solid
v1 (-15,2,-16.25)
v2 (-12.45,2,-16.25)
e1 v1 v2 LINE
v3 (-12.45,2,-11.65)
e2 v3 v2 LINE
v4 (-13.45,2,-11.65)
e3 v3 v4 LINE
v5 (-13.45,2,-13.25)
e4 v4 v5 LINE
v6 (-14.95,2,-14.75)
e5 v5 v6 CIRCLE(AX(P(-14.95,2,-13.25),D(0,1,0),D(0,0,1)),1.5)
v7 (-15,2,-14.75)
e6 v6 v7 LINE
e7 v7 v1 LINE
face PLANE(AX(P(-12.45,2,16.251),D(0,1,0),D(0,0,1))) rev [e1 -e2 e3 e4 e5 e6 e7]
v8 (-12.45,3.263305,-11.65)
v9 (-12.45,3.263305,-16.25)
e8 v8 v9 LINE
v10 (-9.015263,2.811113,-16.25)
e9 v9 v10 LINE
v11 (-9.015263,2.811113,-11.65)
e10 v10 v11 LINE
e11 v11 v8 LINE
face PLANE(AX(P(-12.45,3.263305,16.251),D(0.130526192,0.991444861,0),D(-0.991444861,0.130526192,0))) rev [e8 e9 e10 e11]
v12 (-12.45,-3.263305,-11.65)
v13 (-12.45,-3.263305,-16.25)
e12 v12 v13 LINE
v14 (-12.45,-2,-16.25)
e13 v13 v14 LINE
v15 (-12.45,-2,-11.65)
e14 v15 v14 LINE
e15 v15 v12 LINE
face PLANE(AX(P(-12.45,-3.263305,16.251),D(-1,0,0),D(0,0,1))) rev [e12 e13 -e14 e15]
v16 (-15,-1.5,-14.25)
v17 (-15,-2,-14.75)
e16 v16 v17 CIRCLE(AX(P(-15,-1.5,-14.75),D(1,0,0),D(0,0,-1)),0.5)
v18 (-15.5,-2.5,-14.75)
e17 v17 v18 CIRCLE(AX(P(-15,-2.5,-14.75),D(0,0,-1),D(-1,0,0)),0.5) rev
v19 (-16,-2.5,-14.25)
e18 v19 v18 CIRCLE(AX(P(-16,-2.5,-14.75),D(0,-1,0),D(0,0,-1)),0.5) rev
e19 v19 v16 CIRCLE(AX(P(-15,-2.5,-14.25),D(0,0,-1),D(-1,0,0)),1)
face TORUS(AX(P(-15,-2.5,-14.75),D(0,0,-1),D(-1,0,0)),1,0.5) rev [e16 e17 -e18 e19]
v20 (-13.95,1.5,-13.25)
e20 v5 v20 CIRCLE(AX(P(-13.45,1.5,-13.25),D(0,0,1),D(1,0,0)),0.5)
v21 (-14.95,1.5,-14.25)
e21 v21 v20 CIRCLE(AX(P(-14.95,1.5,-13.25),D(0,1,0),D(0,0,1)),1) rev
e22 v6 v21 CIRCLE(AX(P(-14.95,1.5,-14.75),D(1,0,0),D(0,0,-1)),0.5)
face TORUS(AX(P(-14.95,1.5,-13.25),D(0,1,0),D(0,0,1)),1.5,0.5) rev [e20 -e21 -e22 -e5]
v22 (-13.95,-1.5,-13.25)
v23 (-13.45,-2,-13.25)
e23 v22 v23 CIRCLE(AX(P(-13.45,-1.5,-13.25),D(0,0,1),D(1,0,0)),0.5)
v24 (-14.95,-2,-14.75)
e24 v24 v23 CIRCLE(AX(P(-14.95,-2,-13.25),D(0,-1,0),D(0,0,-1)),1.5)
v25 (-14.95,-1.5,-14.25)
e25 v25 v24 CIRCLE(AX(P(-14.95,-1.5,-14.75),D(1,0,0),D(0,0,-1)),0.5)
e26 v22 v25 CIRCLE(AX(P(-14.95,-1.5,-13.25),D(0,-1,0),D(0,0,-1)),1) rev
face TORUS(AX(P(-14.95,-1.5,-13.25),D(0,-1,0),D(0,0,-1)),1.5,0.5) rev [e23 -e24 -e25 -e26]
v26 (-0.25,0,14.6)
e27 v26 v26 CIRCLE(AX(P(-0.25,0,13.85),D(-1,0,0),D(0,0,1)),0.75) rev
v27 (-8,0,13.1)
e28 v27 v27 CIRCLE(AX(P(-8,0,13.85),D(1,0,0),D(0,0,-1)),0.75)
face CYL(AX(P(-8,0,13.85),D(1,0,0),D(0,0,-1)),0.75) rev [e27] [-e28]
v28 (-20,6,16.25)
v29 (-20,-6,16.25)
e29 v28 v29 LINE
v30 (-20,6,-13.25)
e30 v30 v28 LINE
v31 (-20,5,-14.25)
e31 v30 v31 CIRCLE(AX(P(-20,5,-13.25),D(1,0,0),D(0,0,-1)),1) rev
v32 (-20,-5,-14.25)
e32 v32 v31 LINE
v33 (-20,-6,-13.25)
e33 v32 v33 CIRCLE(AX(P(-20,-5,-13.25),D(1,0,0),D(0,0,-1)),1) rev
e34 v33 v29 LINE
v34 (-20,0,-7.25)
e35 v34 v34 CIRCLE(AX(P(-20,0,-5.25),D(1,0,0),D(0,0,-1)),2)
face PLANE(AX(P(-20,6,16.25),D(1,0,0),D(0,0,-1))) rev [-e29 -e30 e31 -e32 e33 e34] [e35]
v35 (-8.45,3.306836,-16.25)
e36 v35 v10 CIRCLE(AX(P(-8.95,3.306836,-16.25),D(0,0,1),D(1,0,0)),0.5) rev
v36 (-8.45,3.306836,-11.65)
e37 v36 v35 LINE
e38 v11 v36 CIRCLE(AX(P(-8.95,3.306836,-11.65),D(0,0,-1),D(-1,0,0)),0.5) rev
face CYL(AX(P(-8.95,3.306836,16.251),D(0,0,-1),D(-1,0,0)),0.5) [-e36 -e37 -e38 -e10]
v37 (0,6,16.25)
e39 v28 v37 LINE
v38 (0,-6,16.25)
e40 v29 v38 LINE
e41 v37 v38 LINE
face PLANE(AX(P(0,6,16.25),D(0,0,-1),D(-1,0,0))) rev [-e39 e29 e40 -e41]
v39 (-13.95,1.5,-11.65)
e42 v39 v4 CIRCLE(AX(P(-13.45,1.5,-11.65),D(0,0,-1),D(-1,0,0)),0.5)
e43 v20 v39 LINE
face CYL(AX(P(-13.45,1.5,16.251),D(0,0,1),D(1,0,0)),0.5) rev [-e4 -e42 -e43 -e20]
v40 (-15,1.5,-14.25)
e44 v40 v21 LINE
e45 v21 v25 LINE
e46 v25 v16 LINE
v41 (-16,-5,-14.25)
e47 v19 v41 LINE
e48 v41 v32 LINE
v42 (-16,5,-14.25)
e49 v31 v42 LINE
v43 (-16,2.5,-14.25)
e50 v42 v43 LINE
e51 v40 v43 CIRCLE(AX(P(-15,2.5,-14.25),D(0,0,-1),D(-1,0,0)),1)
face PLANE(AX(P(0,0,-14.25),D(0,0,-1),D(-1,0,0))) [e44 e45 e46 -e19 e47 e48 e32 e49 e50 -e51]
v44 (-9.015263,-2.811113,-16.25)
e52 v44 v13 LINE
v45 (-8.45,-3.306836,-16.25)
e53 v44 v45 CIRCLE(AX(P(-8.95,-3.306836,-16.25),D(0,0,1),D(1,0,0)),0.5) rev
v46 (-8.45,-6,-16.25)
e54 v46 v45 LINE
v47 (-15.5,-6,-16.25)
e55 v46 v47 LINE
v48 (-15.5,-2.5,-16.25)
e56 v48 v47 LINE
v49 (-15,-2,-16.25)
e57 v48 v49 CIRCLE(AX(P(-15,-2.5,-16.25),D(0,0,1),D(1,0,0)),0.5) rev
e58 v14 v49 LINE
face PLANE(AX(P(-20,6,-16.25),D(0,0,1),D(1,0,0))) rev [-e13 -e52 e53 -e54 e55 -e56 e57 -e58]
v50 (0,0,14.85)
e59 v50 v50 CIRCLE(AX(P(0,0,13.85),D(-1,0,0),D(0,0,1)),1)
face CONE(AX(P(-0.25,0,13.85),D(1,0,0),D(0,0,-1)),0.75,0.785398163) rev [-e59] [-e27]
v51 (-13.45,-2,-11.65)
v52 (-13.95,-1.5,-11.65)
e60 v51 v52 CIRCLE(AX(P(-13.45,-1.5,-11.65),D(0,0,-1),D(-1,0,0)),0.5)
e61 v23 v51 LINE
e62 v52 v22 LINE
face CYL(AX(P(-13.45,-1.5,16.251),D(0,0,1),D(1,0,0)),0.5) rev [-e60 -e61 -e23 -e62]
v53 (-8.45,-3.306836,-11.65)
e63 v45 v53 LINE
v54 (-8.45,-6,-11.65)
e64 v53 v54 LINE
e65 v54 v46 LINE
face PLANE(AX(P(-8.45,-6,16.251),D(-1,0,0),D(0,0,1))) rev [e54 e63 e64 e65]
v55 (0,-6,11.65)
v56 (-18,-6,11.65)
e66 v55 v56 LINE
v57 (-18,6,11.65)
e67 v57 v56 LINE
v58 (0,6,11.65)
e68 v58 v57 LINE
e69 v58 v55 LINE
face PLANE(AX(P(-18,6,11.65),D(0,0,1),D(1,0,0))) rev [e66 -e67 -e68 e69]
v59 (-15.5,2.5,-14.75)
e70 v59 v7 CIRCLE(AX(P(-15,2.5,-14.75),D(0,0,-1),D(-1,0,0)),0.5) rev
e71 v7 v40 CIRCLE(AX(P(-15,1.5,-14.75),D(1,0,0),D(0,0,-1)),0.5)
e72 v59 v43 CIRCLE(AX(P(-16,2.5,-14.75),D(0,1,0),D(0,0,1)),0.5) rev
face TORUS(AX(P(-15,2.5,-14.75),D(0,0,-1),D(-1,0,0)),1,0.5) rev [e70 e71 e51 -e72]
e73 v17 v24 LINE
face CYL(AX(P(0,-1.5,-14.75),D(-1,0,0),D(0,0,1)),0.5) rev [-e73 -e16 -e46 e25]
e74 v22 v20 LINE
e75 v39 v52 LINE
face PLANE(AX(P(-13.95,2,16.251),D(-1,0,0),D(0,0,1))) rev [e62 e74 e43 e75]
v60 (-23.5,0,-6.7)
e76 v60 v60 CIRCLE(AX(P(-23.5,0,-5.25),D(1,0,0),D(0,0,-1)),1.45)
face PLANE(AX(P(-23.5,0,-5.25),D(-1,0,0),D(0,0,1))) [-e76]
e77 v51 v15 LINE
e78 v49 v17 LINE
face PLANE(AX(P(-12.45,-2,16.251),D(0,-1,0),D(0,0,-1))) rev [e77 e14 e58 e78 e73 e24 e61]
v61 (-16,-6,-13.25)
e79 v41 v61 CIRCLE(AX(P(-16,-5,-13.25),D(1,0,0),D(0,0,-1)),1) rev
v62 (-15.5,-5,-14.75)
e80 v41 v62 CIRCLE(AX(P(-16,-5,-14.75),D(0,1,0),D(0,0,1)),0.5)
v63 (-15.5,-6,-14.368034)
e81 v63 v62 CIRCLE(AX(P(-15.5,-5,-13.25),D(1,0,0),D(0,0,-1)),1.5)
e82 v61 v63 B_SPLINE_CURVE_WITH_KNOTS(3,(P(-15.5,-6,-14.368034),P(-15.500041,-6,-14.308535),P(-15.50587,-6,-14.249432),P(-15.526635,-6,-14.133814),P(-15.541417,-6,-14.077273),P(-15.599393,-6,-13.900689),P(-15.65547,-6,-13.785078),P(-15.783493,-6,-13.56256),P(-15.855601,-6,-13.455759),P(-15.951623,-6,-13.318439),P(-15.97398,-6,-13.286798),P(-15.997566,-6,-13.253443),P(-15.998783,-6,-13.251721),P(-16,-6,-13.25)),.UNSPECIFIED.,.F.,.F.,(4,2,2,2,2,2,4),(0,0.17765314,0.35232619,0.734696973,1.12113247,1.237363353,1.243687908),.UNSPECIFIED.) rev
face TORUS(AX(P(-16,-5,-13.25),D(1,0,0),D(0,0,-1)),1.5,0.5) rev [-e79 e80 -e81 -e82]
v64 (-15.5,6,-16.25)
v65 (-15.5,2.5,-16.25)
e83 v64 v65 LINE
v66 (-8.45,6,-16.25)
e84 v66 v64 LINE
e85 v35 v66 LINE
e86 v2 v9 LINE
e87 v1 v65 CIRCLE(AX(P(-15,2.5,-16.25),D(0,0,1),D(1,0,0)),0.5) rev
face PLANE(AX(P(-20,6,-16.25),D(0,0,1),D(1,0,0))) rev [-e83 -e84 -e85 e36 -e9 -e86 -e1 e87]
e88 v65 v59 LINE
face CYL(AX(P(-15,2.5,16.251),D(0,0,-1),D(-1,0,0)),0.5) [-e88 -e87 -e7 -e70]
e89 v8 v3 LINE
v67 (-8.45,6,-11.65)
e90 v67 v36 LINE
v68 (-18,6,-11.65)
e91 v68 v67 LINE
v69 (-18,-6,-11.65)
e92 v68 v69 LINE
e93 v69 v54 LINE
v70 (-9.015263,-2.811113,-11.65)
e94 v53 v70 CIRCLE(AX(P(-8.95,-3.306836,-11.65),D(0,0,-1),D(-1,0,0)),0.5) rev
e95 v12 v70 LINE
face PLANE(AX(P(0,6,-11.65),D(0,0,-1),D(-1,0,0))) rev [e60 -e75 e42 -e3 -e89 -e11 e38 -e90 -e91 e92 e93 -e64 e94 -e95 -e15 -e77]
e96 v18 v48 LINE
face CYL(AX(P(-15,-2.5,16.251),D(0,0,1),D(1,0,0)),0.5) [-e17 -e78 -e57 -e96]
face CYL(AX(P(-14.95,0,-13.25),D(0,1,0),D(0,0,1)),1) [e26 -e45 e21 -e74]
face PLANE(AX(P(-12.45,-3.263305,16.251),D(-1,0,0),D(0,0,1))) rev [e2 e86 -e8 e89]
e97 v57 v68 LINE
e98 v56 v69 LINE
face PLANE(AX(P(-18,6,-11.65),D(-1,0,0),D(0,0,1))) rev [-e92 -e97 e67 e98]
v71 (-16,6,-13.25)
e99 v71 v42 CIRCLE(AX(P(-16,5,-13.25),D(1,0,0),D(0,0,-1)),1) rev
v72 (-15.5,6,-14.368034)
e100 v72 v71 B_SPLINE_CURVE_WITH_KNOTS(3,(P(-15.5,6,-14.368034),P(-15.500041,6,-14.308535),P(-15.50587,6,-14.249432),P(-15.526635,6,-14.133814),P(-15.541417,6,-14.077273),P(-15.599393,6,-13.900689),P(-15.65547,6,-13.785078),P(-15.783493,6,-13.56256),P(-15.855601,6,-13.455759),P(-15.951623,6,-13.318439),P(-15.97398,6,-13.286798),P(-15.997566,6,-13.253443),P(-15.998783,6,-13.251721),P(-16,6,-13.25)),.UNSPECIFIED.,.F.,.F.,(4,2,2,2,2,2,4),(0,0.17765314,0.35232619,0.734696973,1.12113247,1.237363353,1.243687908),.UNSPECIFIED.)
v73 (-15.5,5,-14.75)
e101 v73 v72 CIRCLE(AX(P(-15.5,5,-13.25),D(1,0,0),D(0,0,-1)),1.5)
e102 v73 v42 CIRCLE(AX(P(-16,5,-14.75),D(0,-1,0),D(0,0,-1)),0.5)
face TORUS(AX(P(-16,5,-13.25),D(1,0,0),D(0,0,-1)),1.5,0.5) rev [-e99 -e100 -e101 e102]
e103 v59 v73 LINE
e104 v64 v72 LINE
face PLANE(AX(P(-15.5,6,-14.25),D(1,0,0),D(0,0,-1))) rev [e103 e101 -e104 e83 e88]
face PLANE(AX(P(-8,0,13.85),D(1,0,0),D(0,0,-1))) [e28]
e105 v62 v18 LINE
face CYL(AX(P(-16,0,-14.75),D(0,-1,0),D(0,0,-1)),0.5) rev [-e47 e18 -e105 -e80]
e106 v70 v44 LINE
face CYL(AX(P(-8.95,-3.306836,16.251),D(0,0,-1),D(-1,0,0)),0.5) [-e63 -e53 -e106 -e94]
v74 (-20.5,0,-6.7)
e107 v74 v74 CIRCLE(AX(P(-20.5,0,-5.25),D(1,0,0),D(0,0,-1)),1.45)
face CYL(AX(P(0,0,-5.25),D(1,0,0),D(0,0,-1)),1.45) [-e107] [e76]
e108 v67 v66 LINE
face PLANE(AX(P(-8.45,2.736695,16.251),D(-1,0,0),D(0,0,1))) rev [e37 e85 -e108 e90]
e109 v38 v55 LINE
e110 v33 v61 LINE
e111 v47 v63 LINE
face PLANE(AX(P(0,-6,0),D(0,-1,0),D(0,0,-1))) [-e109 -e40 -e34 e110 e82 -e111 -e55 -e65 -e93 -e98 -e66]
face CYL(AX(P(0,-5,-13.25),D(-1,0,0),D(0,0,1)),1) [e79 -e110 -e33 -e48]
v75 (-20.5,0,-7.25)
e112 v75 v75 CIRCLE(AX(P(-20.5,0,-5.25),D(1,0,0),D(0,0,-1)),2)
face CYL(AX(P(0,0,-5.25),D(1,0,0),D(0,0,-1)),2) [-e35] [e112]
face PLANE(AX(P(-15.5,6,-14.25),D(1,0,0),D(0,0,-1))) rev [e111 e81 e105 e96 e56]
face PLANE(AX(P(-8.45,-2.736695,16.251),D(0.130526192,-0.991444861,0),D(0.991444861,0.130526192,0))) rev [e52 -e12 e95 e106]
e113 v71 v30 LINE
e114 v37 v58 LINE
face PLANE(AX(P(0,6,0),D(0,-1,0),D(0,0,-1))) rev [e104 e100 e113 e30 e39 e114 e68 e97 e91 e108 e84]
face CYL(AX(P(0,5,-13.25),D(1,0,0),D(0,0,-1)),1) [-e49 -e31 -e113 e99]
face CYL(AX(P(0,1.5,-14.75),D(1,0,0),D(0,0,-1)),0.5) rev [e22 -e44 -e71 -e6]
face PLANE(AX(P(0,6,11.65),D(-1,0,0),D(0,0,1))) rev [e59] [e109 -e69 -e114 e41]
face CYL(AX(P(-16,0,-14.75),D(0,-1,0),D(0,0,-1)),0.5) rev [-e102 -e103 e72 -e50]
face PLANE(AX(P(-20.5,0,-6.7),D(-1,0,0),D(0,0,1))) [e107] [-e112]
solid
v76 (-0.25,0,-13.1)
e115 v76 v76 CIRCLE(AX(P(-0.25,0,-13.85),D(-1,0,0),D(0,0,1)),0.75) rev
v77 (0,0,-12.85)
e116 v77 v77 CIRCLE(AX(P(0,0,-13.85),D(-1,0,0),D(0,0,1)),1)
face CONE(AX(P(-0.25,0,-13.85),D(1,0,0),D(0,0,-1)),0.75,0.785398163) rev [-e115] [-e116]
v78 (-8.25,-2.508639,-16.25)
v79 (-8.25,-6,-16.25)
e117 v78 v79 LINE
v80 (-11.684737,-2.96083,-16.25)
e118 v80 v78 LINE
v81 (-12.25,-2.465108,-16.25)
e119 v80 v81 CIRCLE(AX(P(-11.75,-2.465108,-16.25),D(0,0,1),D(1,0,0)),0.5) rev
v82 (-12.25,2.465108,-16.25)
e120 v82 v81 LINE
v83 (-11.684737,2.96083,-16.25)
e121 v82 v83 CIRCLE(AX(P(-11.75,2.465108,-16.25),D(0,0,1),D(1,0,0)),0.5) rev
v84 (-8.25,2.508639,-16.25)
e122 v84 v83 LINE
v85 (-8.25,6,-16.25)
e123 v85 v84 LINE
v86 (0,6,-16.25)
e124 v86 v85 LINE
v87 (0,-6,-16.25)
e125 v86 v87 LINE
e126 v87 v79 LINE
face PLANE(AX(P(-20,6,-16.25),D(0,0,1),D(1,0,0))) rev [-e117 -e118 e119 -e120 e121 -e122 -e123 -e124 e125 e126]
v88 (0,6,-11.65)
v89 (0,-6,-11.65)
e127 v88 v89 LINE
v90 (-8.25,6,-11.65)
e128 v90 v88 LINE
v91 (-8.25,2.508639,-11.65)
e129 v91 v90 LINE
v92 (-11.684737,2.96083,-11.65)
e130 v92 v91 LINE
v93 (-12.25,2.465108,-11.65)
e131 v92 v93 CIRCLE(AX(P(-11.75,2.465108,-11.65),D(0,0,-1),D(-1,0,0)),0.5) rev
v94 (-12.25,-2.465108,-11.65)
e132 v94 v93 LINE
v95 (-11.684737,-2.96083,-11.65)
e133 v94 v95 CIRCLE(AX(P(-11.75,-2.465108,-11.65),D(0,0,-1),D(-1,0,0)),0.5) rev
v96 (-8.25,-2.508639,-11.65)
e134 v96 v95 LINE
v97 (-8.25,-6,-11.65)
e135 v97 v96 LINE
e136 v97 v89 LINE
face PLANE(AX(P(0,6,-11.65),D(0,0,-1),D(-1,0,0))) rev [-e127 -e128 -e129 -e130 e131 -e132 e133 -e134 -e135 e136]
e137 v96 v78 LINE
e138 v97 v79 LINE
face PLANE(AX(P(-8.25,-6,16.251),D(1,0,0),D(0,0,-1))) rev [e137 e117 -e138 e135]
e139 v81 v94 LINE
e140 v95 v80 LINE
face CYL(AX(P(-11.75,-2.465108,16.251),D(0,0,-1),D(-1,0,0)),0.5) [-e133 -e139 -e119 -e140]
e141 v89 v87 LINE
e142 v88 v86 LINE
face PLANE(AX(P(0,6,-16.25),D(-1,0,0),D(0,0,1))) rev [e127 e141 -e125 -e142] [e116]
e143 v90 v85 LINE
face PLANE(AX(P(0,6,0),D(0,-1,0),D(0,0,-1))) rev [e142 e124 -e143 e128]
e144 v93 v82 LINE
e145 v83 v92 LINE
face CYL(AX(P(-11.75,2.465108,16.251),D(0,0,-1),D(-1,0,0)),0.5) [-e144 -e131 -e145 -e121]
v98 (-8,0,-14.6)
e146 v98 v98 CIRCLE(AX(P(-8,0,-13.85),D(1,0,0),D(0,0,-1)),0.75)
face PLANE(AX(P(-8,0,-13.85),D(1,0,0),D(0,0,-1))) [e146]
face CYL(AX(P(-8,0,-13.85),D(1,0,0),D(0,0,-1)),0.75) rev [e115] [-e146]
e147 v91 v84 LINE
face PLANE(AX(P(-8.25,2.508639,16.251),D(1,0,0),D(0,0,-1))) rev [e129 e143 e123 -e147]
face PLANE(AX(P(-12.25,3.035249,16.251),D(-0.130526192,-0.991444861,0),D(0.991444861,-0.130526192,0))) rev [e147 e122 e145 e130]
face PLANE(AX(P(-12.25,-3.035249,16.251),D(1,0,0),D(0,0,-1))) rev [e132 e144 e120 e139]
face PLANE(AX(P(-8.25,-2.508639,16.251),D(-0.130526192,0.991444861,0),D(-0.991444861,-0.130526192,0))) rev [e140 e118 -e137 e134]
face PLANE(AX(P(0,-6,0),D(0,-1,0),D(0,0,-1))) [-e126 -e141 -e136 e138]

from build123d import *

# Parameters (mm, degrees)
BOSS_EXTRUDE1_DEPTH = 6
SKETCH4_R           = 0.75
CUT_EXTRUDE3_DEPTH  = 8
CHAMFER1_SIZE       = 0.25
CUT_EXTRUDE1_REACH  = 40.63
SKETCH2_W           = 1.5
SKETCH2_H           = 4
SKETCH5_W           = 6.05
SKETCH5_H           = 4
CUT_EXTRUDE5_DEPTH  = 2
SKETCH6_W           = 4.5
SKETCH6_H           = 2
CUT_EXTRUDE6_DEPTH  = 29.426440157
FILLET7_R           = 1
CUT_EXTRUDE2_REACH  = 40.63
FILLET9_R           = 0.5
FILLET3_R           = 0.5


with BuildPart() as part:
    # Sketch1 → Boss-Extrude1 (new, symmetric)
    with BuildSketch(Plane(origin=(0, 0, 0), x_dir=(1, 0, 0), z_dir=(0, 1, 0))):
        Polygon((0, 16.25), (0, 11.65), (-18, 11.65), (-18, -11.65), (0, -11.65), (0, -16.25), (-20, -16.25), (-20, 16.25), align=None)
    extrude(amount=BOSS_EXTRUDE1_DEPTH, both=True)

    # Sketch4 → Cut-Extrude3 (cut)
    with BuildSketch(Plane(origin=(0, 0, 0), x_dir=(0, 0, -1), z_dir=(1, 0, 0))):
        with Locations((13.85, 0)):
            Circle(SKETCH4_R)
        with Locations((-13.85, 0)):
            Circle(SKETCH4_R)
    extrude(amount=-CUT_EXTRUDE3_DEPTH, mode=Mode.SUBTRACT)

    # Chamfer1
    chamfer1_edges = [part.edges().sort_by_distance(p)[0] for p in [
        (0, 0, -13.1),
        (0, 0, 14.6),
    ]]
    chamfer(chamfer1_edges, length=CHAMFER1_SIZE)

    # Sketch2 → Cut-Extrude1 (cut, up to next)
    with BuildSketch(Plane(origin=(0, 0, -16.25), x_dir=(-1, 0, 0), z_dir=(0, 0, -1)), mode=Mode.PRIVATE) as cut_extrude1_sk1:
        with Locations((13.2, 0)):
            Rectangle(SKETCH2_W, SKETCH2_H)
    cut_extrude1_tool1 = extrude(cut_extrude1_sk1.sketch, amount=-CUT_EXTRUDE1_REACH, mode=Mode.PRIVATE) & part.part
    add(cut_extrude1_tool1.solids().sort_by_distance((-13.2, 0, -16.25))[0], mode=Mode.SUBTRACT)

    # Sketch5 → Cut-Extrude5 (cut)
    with BuildSketch(Plane(origin=(0, 0, -16.25), x_dir=(-1, 0, 0), z_dir=(0, 0, -1))):
        with Locations((16.975, 0)):
            Rectangle(SKETCH5_W, SKETCH5_H)
    extrude(amount=-CUT_EXTRUDE5_DEPTH, mode=Mode.SUBTRACT)

    # Sketch6 → Cut-Extrude6 (cut, through all)
    with BuildSketch(Plane.XZ.offset(6)):
        with Locations((-17.75, -15.25)):
            Rectangle(SKETCH6_W, SKETCH6_H)
    extrude(amount=-CUT_EXTRUDE6_DEPTH, mode=Mode.SUBTRACT)

    # Fillet7
    fillet7_edges = [part.edges().sort_by_distance(p)[0] for p in [
        (-13.95, 0, -14.25),
        (-17.75, 6, -14.25),
        (-17.75, -6, -14.25),
    ]]
    fillet(fillet7_edges, radius=FILLET7_R)

    # Sketch3 → Cut-Extrude2 (cut, up to next)
    with BuildSketch(Plane(origin=(0, 0, -16.25), x_dir=(-1, 0, 0), z_dir=(0, 0, -1)), mode=Mode.PRIVATE) as cut_extrude2_sk1:
        Polygon((8.45, -6), (8.45, -2.736695005), (12.45, -3.263304995), (12.45, 3.263304995), (8.45, 2.736695005), (8.45, 6), (8.25, 6), (8.25, 2.508638713), (12.25, 3.035248704), (12.25, -3.035248704), (8.25, -2.508638713), (8.25, -6), align=None)
    cut_extrude2_tool1 = extrude(cut_extrude2_sk1.sketch, amount=-CUT_EXTRUDE2_REACH, mode=Mode.PRIVATE) & part.part
    add(cut_extrude2_tool1.solids().sort_by_distance((-8.322862, -4.368348, -16.25))[0], mode=Mode.SUBTRACT)


with BuildPart() as cut_extrude2_piece_1:
    # of the separate pieces the step leaves, piece 1, a body of its own (cut_extrude2_pieces)
    add(part.part.solids().sort_by_distance((-13.95, -2, -13.25))[0])

    # Fillet9
    # the kernel refuses this fillet: 0.5 mm, written as the material it takes off along each edge
    with BuildSketch(Plane(origin=(-15.5, -2, -17.5), x_dir=(1, 0, 0), z_dir=(0, 0, 1)), Plane(origin=(-15.5, 2, -14.25), x_dir=(1, 0, 0), z_dir=(0, 0, -1))) as fillet9_piece_1:
        with BuildLine():
            CenterArc((FILLET9_R, -FILLET9_R), FILLET9_R, 90, 90)
            Line((0, -FILLET9_R), (0, 0))
            Line((0, 0), (FILLET9_R, 0))
        make_face()
    extrude(amount=3.25, mode=Mode.SUBTRACT)
    with BuildSketch(Plane(origin=(-8.45, 2.736695005, -17.675351823), x_dir=(-0.9914448613738108, 0.1305261922200488, 0), z_dir=(0, 0, 1)), Plane(origin=(-8.45, -2.736695005, -17.675351823), x_dir=(0, -1, 0), z_dir=(0, 0, 1))) as fillet9_piece_2:
        with BuildLine():
            CenterArc((FILLET9_R * 1.14028145817, -FILLET9_R), FILLET9_R, 90, 97.5)
            Line((FILLET9_R * 0.148836596794, -FILLET9_R * 1.13052619222), (0, 0))
            Line((0, 0), (FILLET9_R * 1.14028145817, 0))
        make_face()
    extrude(amount=7.450703645, mode=Mode.SUBTRACT)
    # the kernel refuses this fillet: 0.5 mm, written as the material it adds along each edge
    with BuildSketch(Plane(origin=(-13.95, -2, -13.25), x_dir=(0, 1, 0), z_dir=(0, 0, 1))) as fillet9_2_piece_1:
        with BuildLine():
            CenterArc((FILLET9_R, -FILLET9_R), FILLET9_R, 90, 90)
            Line((0, -FILLET9_R), (0, 0))
            Line((0, 0), (FILLET9_R, 0))
        make_face()
    extrude(amount=1.6)
    with BuildSketch(Plane(origin=(-14.95, -2, -13.25), x_dir=(1, 0, 0), z_dir=(0, 0, 1))) as fillet9_2_piece_2:
        with BuildLine():
            CenterArc((1 + FILLET9_R, FILLET9_R), FILLET9_R, 180, 90)
            Line((1, FILLET9_R), (1, 0))
            Line((1, 0), (1 + FILLET9_R, 0))
        make_face()
    revolve(axis=Axis((-14.95, -2, -13.25), (0, 1, 0)), revolution_arc=90)
    with BuildSketch(Plane(origin=(-13.95, 2, -13.25), x_dir=(0, -1, 0), z_dir=(0, 0, 1))) as fillet9_2_piece_3:
        with BuildLine():
            CenterArc((FILLET9_R, FILLET9_R), FILLET9_R, 180, 90)
            Line((0, FILLET9_R), (0, 0))
            Line((0, 0), (FILLET9_R, 0))
        make_face()
    extrude(amount=1.6)
    with BuildSketch(Plane(origin=(-14.95, 2, -13.25), x_dir=(1, 0, 0), z_dir=(0, 0, 1))) as fillet9_2_piece_4:
        with BuildLine():
            CenterArc((1 + FILLET9_R, -FILLET9_R), FILLET9_R, 90, 90)
            Line((1 + FILLET9_R, 0), (1, 0))
            Line((1, 0), (1, -FILLET9_R))
        make_face()
    revolve(axis=Axis((-14.95, 2, -13.25), (0, 1, 0)), revolution_arc=90)
    with BuildSketch(Plane(origin=(-15.5, 2.5, -14.25), x_dir=(-1, 0, 0), z_dir=(0, 1, 0)), Plane(origin=(-15.5, -5, -14.25), x_dir=(-1, 0, 0), z_dir=(0, 1, 0))) as fillet9_2_piece_5:
        with BuildLine():
            CenterArc((FILLET9_R, -FILLET9_R), FILLET9_R, 90, 90)
            Line((0, -FILLET9_R), (0, 0))
            Line((0, 0), (FILLET9_R, 0))
        make_face()
    extrude(amount=2.5)
    with BuildSketch(Plane(origin=(-14.95, 2, -14.25), x_dir=(0, 0, -1), z_dir=(-1, 0, 0)), Plane(origin=(-15, -2, -14.25), x_dir=(0, 0, -1), z_dir=(1, 0, 0))) as fillet9_2_piece_6:
        with BuildLine():
            CenterArc((FILLET9_R, FILLET9_R), FILLET9_R, 180, 90)
            Line((0, FILLET9_R), (0, 0))
            Line((0, 0), (FILLET9_R, 0))
        make_face()
    extrude(amount=0.05)
    with BuildSketch(Plane(origin=(-15.5, 5, -13.25), x_dir=(0, 0, -1), z_dir=(0, -1, 0))) as fillet9_2_piece_7_section:
        with BuildLine():
            CenterArc((1 + FILLET9_R, -FILLET9_R), FILLET9_R, 90, 90)
            Line((1 + FILLET9_R, 0), (1, 0))
            Line((1, 0), (1, -FILLET9_R))
        make_face()
    fillet9_2_piece_7 = revolve(axis=Axis((-15.5, 5, -13.25), (1, 0, 0)), revolution_arc=161.648494619, mode=Mode.PRIVATE)
    fillet9_2_piece_7 = split(fillet9_2_piece_7, bisect_by=Plane(origin=(-15.636075231, 6, -13.981098286), z_dir=(0, -1, 0)), keep=Keep.TOP, mode=Mode.PRIVATE)
    add(fillet9_2_piece_7)
    with BuildSketch(Plane(origin=(-15.5, -5, -13.25), x_dir=(0, 0, -1), z_dir=(0, 1, 0))) as fillet9_2_piece_8_section:
        with BuildLine():
            CenterArc((1 + FILLET9_R, FILLET9_R), FILLET9_R, 180, 90)
            Line((1 + FILLET9_R, 0), (1, 0))
            Line((1, 0), (1, FILLET9_R))
        make_face()
    fillet9_2_piece_8 = revolve(axis=Axis((-15.5, -5, -13.25), (-1, 0, 0)), revolution_arc=161.648494619, mode=Mode.PRIVATE)
    fillet9_2_piece_8 = split(fillet9_2_piece_8, bisect_by=Plane(origin=(-15.636075231, -6, -13.981098286), z_dir=(0, 1, 0)), keep=Keep.TOP, mode=Mode.PRIVATE)
    add(fillet9_2_piece_8)
    with BuildSketch(Plane(origin=(-15, -2.5, -14.25), x_dir=(0, 1, 0), z_dir=(1, 0, 0))) as fillet9_2_piece_9:
        with BuildLine():
            CenterArc((0.5 + FILLET9_R, -FILLET9_R), FILLET9_R, 90, 90)
            Line((0.5, -FILLET9_R), (0.5, 0))
            Line((0.5, 0), (0.5 + FILLET9_R, 0))
        make_face()
    revolve(axis=Axis((-15, -2.5, -14.25), (0, 0, 1)), revolution_arc=90)
    with BuildSketch(Plane(origin=(-15, 2.5, -14.25), x_dir=(0, -1, 0), z_dir=(1, 0, 0))) as fillet9_2_piece_10:
        with BuildLine():
            CenterArc((0.5 + FILLET9_R, FILLET9_R), FILLET9_R, 180, 90)
            Line((0.5, FILLET9_R), (0.5, 0))
            Line((0.5, 0), (0.5 + FILLET9_R, 0))
        make_face()
    revolve(axis=Axis((-15, 2.5, -14.25), (0, 0, -1)), revolution_arc=90)

    # Sketch9 → Revolve2 (revolve)
    with BuildSketch(Plane(origin=(0, 0, 0), x_dir=(1, 0, 0), z_dir=(0, 1, 0))):
        Polygon((-20, 5.25), (-23.5, 5.25), (-23.5, 6.7), (-20.5, 6.7), (-20.5, 7.25), (-20, 7.25), align=None)
    revolve(axis=Axis((0, 0, -5.25), (-1, 0, 0)))


with BuildPart() as cut_extrude2_piece_2:
    # of the separate pieces the step leaves, piece 2, a body of its own (cut_extrude2_pieces)
    add(part.part.solids().sort_by_distance((0, 6, -11.65))[0])

    # Fillet3
    fillet3_edges = [cut_extrude2_piece_2.edges().sort_by_distance(p)[0] for p in [
        (-12.25, 3.035248704, -13.95),
        (-12.25, -3.035248704, -13.95),
    ]]
    fillet(fillet3_edges, radius=FILLET3_R)


solid = Compound([cut_extrude2_piece_1.part, cut_extrude2_piece_2.part])
